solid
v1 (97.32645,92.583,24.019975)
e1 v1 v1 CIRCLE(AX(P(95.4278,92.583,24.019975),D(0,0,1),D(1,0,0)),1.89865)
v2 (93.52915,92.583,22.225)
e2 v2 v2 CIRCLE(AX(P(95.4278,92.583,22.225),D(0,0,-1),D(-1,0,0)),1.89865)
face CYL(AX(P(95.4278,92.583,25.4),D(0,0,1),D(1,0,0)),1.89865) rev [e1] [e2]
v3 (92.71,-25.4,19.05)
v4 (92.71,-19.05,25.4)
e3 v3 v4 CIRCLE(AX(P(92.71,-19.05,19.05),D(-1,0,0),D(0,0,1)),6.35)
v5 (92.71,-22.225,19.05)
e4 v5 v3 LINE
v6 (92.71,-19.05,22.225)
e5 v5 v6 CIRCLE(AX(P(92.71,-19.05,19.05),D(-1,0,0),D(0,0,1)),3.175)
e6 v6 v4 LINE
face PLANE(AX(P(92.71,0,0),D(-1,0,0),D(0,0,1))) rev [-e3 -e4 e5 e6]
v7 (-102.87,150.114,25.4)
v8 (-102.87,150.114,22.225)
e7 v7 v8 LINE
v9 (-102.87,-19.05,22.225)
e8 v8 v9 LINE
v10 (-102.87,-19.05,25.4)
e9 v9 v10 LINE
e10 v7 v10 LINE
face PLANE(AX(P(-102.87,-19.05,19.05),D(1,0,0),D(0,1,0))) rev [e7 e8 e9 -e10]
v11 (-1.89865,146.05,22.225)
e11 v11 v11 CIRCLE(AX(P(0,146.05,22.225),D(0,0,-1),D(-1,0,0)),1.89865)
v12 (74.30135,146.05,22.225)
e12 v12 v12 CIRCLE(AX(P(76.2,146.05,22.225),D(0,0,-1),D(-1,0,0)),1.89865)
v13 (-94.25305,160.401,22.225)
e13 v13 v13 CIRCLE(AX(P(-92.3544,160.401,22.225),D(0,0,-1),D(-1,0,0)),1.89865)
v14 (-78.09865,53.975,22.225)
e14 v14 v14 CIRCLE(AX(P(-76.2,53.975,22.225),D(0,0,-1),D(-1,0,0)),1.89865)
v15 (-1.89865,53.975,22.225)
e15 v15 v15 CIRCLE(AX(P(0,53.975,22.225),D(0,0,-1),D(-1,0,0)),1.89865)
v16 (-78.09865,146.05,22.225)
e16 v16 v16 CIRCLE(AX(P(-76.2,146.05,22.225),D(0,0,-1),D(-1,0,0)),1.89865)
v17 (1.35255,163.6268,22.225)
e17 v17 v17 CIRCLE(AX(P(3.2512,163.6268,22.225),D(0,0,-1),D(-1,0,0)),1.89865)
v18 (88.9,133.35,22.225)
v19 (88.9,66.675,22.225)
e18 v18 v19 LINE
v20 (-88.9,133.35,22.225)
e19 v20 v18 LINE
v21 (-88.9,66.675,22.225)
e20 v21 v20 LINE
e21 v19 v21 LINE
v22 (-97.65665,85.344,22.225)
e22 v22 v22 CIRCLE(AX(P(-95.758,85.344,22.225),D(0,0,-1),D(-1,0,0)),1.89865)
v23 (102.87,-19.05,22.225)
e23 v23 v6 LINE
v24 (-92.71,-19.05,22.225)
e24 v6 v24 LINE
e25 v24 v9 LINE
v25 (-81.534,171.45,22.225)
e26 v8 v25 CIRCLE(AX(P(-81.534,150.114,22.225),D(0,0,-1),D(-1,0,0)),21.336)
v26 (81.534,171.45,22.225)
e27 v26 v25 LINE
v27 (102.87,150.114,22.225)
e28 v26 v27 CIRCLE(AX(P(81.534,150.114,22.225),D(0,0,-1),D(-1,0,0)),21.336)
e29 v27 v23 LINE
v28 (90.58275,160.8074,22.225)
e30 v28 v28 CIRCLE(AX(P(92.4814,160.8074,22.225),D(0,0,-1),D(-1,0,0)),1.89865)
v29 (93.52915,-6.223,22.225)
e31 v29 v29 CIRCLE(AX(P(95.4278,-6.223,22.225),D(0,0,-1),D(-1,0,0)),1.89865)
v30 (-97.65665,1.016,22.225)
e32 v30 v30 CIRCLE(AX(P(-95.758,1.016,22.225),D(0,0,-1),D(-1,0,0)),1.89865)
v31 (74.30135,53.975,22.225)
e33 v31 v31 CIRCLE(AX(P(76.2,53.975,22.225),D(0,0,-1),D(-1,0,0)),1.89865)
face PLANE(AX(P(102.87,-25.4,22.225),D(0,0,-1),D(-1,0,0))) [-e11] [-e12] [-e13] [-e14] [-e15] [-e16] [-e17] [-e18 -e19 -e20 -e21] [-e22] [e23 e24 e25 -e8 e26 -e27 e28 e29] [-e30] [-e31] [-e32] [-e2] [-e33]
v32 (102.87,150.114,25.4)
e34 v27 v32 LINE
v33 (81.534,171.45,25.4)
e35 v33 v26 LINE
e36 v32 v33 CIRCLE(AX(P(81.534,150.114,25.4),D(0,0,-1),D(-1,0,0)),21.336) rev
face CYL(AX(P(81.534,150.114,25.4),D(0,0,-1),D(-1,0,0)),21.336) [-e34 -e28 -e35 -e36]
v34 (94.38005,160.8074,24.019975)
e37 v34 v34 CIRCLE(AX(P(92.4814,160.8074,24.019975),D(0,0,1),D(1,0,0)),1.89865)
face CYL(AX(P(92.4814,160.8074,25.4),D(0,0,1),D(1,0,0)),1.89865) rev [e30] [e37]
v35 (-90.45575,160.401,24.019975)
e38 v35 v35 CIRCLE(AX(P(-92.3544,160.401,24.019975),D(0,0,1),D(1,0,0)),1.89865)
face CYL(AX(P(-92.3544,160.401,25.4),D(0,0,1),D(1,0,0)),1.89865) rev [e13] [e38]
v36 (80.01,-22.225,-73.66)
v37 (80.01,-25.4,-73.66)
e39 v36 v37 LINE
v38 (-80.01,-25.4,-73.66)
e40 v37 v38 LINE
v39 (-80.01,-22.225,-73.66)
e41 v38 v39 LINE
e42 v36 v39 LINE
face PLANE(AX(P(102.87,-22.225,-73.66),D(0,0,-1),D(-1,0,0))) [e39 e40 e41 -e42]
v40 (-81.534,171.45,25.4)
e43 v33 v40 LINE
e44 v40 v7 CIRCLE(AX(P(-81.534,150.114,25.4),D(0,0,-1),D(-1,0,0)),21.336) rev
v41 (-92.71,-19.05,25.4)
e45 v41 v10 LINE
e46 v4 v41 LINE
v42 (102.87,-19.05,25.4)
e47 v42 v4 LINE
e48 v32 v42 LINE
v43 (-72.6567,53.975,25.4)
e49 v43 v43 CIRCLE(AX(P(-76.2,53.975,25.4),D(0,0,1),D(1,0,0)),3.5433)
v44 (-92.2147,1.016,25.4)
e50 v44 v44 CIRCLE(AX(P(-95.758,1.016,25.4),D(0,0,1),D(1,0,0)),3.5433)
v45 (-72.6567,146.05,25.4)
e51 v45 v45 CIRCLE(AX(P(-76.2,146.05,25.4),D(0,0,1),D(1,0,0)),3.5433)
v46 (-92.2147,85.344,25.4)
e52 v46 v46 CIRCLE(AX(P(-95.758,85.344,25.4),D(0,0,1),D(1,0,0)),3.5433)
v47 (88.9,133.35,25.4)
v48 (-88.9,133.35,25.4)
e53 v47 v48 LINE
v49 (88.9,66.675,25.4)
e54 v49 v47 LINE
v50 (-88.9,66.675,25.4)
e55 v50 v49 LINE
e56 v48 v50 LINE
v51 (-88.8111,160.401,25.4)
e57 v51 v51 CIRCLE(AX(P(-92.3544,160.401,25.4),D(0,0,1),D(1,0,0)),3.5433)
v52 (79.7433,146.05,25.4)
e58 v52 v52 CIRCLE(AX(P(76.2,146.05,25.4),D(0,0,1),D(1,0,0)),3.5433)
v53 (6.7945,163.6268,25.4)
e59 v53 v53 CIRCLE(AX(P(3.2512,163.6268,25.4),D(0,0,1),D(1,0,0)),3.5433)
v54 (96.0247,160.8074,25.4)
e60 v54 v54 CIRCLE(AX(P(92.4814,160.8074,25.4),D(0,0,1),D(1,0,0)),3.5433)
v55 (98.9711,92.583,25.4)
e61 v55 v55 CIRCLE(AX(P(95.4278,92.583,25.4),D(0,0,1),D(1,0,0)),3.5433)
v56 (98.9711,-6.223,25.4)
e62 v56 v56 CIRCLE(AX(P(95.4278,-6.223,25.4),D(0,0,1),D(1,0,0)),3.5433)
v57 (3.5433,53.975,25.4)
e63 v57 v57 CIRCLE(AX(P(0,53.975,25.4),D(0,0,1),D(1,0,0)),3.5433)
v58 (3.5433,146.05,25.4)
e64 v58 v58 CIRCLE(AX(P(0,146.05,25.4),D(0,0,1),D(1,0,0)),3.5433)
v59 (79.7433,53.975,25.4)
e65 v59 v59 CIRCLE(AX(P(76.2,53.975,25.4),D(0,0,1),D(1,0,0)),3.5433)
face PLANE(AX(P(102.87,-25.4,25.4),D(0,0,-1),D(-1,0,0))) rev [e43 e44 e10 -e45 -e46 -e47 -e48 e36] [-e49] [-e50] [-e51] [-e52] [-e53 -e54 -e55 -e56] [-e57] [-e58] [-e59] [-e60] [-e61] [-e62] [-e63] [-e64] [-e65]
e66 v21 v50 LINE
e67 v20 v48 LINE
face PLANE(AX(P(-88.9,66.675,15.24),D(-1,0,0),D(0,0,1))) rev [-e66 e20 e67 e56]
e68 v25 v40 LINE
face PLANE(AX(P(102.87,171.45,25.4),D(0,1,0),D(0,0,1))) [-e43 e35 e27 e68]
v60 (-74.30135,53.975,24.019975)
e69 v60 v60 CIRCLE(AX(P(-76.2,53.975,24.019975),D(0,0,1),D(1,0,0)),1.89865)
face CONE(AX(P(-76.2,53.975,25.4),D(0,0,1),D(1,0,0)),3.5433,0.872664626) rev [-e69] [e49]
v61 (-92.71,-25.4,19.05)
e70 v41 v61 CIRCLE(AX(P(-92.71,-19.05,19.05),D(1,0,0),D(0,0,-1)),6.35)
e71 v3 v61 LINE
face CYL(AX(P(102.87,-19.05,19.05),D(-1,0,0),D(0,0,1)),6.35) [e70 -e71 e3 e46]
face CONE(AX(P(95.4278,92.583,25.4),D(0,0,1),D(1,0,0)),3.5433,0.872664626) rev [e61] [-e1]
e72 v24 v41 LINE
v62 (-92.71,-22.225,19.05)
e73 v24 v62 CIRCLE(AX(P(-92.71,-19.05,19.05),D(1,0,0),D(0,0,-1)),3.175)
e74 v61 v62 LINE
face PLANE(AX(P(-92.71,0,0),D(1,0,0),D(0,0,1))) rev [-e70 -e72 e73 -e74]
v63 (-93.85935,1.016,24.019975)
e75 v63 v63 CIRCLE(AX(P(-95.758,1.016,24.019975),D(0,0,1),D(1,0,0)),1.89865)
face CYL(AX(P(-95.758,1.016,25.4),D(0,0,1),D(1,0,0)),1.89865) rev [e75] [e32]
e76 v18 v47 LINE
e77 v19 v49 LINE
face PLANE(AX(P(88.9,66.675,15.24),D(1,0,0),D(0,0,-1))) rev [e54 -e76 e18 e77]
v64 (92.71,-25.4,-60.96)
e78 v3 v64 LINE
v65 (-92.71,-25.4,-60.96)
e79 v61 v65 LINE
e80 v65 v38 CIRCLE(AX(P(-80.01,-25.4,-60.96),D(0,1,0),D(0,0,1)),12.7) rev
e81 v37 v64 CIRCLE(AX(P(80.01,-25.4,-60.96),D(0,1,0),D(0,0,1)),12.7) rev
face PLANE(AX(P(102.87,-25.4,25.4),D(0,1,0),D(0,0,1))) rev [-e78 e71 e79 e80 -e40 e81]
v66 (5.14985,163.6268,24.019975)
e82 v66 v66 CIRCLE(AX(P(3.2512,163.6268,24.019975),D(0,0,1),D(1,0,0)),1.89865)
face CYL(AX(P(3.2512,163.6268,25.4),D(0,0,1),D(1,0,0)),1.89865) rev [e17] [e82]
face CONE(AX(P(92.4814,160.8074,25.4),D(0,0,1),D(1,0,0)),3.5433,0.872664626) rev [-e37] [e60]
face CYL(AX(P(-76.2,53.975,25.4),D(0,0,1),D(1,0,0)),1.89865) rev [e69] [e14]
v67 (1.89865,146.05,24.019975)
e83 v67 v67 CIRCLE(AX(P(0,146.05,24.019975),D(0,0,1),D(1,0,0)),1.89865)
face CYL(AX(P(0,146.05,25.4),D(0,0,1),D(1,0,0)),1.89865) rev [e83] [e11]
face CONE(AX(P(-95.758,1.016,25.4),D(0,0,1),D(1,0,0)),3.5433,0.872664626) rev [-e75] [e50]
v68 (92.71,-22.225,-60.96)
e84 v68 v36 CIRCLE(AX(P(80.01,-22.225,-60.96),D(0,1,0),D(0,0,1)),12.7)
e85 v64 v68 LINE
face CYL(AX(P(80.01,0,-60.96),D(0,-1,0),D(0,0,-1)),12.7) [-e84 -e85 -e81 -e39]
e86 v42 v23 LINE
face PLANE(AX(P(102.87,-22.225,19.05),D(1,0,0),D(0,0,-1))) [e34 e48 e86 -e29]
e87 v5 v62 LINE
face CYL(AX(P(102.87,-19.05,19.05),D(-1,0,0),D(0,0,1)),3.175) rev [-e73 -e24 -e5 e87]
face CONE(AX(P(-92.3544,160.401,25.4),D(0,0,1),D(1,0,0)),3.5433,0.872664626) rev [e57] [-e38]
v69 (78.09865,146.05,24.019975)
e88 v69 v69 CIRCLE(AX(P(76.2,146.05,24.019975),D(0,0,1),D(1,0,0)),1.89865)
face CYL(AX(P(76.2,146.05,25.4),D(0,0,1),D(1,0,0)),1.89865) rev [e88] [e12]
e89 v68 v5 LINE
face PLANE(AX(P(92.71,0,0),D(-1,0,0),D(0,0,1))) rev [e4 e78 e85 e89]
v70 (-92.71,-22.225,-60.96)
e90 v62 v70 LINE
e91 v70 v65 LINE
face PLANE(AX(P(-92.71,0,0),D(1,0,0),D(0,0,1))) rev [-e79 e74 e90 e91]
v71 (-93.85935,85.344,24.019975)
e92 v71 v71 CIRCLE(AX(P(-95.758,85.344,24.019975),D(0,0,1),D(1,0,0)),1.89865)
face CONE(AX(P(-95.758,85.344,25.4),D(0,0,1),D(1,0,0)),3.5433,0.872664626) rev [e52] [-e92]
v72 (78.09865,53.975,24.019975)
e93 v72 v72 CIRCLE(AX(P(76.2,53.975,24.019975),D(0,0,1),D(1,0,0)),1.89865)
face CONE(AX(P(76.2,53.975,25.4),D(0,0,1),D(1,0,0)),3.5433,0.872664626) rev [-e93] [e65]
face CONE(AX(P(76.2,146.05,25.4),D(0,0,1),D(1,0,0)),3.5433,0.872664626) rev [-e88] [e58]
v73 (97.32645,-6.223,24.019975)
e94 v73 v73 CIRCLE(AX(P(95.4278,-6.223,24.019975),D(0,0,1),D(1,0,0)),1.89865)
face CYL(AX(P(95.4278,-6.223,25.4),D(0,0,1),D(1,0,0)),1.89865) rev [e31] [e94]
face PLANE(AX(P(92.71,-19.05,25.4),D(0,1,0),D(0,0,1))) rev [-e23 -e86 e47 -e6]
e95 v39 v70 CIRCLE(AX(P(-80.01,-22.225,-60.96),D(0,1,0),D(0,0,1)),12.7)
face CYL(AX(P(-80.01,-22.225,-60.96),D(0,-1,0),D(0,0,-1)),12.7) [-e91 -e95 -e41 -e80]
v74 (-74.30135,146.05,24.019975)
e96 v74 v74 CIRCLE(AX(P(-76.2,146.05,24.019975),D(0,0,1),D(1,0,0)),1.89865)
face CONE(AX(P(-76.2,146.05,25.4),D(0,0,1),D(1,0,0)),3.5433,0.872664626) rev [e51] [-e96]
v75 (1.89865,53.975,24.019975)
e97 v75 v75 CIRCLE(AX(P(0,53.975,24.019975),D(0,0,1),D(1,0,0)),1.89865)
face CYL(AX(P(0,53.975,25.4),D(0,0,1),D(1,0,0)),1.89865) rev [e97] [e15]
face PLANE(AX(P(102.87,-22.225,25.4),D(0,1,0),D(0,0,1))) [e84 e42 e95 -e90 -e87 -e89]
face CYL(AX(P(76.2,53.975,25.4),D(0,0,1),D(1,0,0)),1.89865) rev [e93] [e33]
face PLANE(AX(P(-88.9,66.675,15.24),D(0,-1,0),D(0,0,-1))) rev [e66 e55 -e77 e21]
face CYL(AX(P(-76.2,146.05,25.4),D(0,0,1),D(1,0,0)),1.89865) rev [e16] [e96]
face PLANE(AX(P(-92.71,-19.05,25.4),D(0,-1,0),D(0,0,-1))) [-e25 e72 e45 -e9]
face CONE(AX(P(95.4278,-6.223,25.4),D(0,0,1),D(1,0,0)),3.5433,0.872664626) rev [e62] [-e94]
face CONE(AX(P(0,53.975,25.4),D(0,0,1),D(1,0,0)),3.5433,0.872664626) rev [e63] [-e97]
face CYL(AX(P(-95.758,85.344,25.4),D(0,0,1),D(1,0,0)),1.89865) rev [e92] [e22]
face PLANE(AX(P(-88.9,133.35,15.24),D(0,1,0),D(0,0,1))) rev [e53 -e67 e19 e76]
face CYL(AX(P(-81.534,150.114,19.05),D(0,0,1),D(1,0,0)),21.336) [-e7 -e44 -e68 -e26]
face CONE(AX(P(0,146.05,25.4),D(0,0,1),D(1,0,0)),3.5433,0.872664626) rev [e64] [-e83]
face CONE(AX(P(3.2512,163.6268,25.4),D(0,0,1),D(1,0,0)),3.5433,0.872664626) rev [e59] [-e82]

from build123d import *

# Parameters (mm, degrees)
BASE_FLANGE1_DEPTH                                = 102.87
SKETCH6_W                                         = 6.35
SKETCH6_H                                         = 99.06
CUT_EXTRUDE1_DEPTH                                = 10.16
FILLET1_R                                         = 21.336
FILLET2_R                                         = 12.7
SKETCH8_W                                         = 177.8
SKETCH8_H                                         = 66.675
CUT_EXTRUDE2_DEPTH                                = 10.16
CSK_FOR_6_FLAT_HEAD_MACHINE_SCREW_100_D           = 3.7973
CSK_FOR_6_FLAT_HEAD_MACHINE_SCREW_100_CSINK_D     = 7.0866
CSK_FOR_6_FLAT_HEAD_MACHINE_SCREW_100_CSINK_ANGLE = 100
CSK_FOR_6_FLAT_HEAD_MACHINE_SCREW_2_D             = 3.7973
CSK_FOR_6_FLAT_HEAD_MACHINE_SCREW_2_CSINK_D       = 7.0866
CSK_FOR_6_FLAT_HEAD_MACHINE_SCREW_2_CSINK_ANGLE   = 100


# Sheet-metal steps are written as plain solids
with BuildPart() as part:
    # Sketch1 → Base-Flange1 (new, symmetric)
    with BuildSketch(Plane.YZ):
        with BuildLine():
            Line((-25.4, -73.66), (-25.4, 19.05))
            ThreePointArc((-25.4, 19.05), (-23.540128061, 23.540128061), (-19.05, 25.4))
            Line((-19.05, 25.4), (171.45, 25.4))
            Line((171.45, 25.4), (171.45, 22.225))
            Line((171.45, 22.225), (-19.05, 22.225))
            ThreePointArc((-19.05, 22.225), (-21.29506403, 21.29506403), (-22.225, 19.05))
            Line((-22.225, 19.05), (-22.225, -73.66))
            Line((-22.225, -73.66), (-25.4, -73.66))
        make_face()
    extrude(amount=BASE_FLANGE1_DEPTH, both=True)

    # Sketch6 → Cut-Extrude1 (cut)
    with BuildSketch(Plane.YZ.offset(102.87)):
        with Locations((-22.225, -24.13)):
            Rectangle(SKETCH6_W, SKETCH6_H)
    cut_extrude1 = extrude(amount=-CUT_EXTRUDE1_DEPTH, mode=Mode.SUBTRACT)

    # Mirror1: Cut-Extrude1 across plane
    add(cut_extrude1.mirror(Plane(origin=(0, 0, 0), x_dir=(0, 0, 1), z_dir=(1, 0, 0))), mode=Mode.SUBTRACT)

    # Fillet1
    fillet1_edges = [part.edges().sort_by_distance(p)[0] for p in [
        (102.87, 171.45, 23.8125),
        (-102.87, 171.45, 23.8125),
    ]]
    fillet(fillet1_edges, radius=FILLET1_R)

    # Fillet2
    fillet2_edges = [part.edges().sort_by_distance(p)[0] for p in [
        (92.71, -23.8125, -73.66),
        (-92.71, -23.8125, -73.66),
    ]]
    fillet(fillet2_edges, radius=FILLET2_R)

    # Sketch8 → Cut-Extrude2 (cut)
    with BuildSketch(Plane.XY.offset(25.4)):
        with Locations((0, 100.0125)):
            Rectangle(SKETCH8_W, SKETCH8_H)
    extrude(amount=-CUT_EXTRUDE2_DEPTH, mode=Mode.SUBTRACT)

    # CSK for _6 Flat Head Machine Screw _100 (through all)
    with Locations(Plane.XY.offset(25.4)):
        with Locations((-76.2, 146.05), (0, 146.05), (76.2, 146.05), (76.2, 53.975), (0, 53.975), (-76.2, 53.975)):
            CounterSinkHole(CSK_FOR_6_FLAT_HEAD_MACHINE_SCREW_100_D / 2, CSK_FOR_6_FLAT_HEAD_MACHINE_SCREW_100_CSINK_D / 2, counter_sink_angle=CSK_FOR_6_FLAT_HEAD_MACHINE_SCREW_100_CSINK_ANGLE)

    # CSK for _6 Flat Head Machine Screw _ 2 (through all)
    with Locations(Plane.XY.offset(25.4)):
        with Locations((92.4814, 160.8074), (95.4278, 92.583), (95.4278, -6.223), (-95.758, 1.016), (-95.758, 85.344), (-92.3544, 160.401), (3.2512, 163.6268)):
            CounterSinkHole(CSK_FOR_6_FLAT_HEAD_MACHINE_SCREW_2_D / 2, CSK_FOR_6_FLAT_HEAD_MACHINE_SCREW_2_CSINK_D / 2, counter_sink_angle=CSK_FOR_6_FLAT_HEAD_MACHINE_SCREW_2_CSINK_ANGLE)


solid = part.part
